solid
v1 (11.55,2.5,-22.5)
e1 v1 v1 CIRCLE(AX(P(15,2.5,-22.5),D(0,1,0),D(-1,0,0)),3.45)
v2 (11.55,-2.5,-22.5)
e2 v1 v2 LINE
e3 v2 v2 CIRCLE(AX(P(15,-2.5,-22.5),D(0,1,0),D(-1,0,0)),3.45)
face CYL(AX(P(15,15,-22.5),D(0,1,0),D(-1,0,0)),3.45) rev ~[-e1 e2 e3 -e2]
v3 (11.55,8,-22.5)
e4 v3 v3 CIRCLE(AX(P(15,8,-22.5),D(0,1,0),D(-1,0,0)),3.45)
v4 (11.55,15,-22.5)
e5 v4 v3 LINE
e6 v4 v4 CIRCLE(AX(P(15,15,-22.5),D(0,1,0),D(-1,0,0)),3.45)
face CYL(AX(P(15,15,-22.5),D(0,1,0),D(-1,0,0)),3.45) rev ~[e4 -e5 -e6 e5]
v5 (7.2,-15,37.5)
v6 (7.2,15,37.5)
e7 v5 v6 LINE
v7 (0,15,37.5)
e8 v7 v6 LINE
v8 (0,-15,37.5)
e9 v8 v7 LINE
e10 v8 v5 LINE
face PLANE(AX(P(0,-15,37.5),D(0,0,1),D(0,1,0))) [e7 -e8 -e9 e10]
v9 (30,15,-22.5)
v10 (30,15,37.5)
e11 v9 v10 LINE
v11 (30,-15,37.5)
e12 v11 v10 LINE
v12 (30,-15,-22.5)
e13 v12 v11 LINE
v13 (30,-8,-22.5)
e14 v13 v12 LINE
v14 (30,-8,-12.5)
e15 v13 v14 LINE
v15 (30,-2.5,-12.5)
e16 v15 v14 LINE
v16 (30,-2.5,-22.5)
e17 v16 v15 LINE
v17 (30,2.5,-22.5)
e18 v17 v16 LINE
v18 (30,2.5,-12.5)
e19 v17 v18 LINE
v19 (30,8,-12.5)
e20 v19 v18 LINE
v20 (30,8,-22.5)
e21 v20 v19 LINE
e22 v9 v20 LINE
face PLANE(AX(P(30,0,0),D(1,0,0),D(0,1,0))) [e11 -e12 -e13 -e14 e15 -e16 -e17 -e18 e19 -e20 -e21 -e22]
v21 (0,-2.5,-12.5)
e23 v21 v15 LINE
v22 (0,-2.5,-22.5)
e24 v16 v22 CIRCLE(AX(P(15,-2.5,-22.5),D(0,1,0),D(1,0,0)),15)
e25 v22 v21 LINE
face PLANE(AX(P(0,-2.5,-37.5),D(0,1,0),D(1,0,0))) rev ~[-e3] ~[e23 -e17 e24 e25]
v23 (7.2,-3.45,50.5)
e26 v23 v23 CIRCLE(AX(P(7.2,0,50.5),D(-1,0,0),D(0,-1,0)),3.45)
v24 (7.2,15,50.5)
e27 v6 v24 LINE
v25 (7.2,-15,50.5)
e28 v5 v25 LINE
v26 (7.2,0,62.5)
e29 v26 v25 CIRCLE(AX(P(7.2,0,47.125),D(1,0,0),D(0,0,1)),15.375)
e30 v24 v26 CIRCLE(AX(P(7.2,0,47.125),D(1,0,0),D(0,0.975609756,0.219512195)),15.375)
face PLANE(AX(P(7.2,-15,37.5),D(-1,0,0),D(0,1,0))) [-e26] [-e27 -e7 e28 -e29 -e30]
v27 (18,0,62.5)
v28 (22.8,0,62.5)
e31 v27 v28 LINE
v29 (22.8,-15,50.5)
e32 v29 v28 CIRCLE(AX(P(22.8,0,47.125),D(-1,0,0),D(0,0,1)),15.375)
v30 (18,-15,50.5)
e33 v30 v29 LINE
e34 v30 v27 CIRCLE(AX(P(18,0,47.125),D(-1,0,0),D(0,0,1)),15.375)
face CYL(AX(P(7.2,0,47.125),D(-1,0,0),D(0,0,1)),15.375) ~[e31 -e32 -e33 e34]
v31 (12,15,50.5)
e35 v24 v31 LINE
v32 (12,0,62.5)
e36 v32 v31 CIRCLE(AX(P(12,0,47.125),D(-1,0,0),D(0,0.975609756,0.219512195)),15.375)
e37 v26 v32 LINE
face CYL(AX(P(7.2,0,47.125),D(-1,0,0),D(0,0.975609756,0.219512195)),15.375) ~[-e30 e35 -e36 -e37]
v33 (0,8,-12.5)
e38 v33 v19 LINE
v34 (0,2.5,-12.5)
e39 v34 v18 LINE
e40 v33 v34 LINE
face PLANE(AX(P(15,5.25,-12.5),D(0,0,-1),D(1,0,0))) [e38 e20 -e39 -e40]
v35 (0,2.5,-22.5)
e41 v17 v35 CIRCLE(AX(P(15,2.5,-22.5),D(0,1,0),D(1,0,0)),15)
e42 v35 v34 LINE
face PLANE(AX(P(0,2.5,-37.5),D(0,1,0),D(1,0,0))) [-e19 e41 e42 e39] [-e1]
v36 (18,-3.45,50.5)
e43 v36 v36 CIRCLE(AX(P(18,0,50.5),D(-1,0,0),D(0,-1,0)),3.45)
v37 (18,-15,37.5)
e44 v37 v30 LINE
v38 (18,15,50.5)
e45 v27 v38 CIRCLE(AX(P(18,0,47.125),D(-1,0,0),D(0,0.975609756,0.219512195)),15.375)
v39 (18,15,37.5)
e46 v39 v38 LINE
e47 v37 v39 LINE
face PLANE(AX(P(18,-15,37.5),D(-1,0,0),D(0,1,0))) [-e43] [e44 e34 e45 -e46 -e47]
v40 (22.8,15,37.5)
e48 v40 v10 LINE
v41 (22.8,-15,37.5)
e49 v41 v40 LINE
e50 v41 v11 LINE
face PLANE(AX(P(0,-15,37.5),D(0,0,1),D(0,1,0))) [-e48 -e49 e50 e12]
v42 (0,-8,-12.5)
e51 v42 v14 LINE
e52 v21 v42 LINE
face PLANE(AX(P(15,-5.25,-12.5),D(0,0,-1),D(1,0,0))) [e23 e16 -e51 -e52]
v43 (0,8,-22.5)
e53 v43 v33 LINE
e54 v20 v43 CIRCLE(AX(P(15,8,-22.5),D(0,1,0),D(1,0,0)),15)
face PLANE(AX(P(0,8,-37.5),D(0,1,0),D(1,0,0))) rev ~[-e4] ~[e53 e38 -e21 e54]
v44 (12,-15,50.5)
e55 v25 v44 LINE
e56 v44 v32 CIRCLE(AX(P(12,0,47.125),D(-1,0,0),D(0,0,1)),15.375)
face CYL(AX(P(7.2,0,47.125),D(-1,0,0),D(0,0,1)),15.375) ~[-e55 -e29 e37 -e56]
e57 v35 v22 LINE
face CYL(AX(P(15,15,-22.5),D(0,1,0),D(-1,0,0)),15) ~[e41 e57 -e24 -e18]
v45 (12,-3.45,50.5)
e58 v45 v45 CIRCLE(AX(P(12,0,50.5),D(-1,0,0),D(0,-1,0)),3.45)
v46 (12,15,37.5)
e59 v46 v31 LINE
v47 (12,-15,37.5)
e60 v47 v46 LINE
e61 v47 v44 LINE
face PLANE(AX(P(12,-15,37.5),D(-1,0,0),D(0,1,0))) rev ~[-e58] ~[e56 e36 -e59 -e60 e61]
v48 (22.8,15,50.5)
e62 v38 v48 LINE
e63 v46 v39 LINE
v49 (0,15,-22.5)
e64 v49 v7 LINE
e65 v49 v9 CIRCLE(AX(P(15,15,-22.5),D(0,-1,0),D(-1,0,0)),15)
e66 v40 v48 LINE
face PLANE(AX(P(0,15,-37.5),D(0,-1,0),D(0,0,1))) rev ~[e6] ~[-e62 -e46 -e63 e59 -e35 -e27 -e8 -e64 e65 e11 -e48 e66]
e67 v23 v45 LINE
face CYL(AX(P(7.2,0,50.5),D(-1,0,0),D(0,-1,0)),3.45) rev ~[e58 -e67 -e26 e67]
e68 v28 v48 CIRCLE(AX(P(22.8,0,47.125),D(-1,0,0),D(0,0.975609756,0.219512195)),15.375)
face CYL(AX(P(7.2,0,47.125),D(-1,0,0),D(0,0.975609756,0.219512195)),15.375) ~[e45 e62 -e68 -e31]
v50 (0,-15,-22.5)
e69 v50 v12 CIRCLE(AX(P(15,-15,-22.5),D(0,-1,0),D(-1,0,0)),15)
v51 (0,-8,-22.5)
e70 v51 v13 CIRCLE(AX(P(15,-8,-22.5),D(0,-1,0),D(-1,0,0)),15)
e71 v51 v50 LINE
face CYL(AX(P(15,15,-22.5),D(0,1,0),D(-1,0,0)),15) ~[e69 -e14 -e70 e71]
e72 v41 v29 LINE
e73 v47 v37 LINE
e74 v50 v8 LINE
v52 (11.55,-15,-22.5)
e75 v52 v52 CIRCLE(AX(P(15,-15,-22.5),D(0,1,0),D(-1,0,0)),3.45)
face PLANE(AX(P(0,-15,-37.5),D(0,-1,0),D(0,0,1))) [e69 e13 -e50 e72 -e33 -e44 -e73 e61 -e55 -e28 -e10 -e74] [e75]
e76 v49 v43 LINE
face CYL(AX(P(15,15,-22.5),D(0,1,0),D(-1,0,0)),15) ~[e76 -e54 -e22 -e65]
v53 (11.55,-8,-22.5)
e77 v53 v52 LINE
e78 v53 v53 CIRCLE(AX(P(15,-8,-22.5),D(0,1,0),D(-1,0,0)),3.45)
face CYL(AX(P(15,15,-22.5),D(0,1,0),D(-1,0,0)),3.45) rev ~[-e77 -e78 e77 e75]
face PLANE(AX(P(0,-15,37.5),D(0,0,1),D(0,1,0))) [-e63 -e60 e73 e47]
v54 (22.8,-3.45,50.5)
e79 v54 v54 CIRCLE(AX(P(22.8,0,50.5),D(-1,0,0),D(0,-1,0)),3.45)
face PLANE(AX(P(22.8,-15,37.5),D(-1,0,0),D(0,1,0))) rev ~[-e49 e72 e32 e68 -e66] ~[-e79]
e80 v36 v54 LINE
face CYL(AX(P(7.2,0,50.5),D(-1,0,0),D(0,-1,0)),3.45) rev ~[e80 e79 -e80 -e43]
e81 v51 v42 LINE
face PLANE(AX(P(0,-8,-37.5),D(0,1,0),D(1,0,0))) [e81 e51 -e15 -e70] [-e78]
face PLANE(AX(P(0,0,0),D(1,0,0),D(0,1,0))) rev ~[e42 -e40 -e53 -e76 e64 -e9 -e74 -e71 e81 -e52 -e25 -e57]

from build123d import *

# Parameters (mm, degrees)
F0_W      = 30
F0_H      = 75
F1_DEPTH  = 30
F4_DEPTH  = 30.001
F2_W      = 30
F2_H      = 5.5
F5_DEPTH  = 25
F3_R      = 3.45
F6_DEPTH  = 30.001
F7_W      = 4.8
F7_H      = 30
F8_DEPTH  = 25
F10_DEPTH = 22.801
F9_R      = 3.45
F11_DEPTH = 22.801


with BuildPart() as f1:
    # F0 (on Right) → F1 (new body)
    with BuildSketch(Plane.YZ):
        Rectangle(F0_W, F0_H)
    extrude(amount=F1_DEPTH)

    # F3 (on face) → F4 (cut, through all)
    with BuildSketch(Plane(origin=(0, 15, 0), x_dir=(-1, 0, 0), z_dir=(0, 1, 0))):
        with BuildLine():
            ThreePointArc((-15, -37.5), (-25.6066017178, -33.1066017178), (-30, -22.5))
            Line((-30, -22.5), (-30, -37.5))
            Line((-30, -37.5), (-15, -37.5))
        make_face()
        with BuildLine():
            ThreePointArc((0, -22.5), (-4.3933982822, -33.1066017178), (-15, -37.5))
            Line((-15, -37.5), (0, -37.5))
            Line((0, -37.5), (0, -22.5))
        make_face()
    extrude(amount=-F4_DEPTH, mode=Mode.SUBTRACT)

    # F2 (on face) → F5 (cut)
    with BuildSketch(Plane(origin=(0, 0, -37.5), x_dir=(1, 0, 0), z_dir=(0, 0, -1))):
        with Locations((15, 5.25)):
            Rectangle(F2_W, F2_H)
        with Locations((15, -5.25)):
            Rectangle(F2_W, F2_H)
    extrude(amount=-F5_DEPTH, mode=Mode.SUBTRACT)

    # F3 (on face) → F6 (cut, through all)
    with BuildSketch(Plane(origin=(0, 15, 0), x_dir=(-1, 0, 0), z_dir=(0, 1, 0))):
        with Locations((-15, -22.5)):
            Circle(F3_R)
    extrude(amount=-F6_DEPTH, mode=Mode.SUBTRACT)

    # F7 (on face) → F8 (join)
    with BuildSketch(Plane.XY.offset(37.5)):
        with Locations((9.6, 0)):
            Rectangle(F7_W, F7_H)
        with Locations((20.4, 0)):
            Rectangle(F7_W, F7_H)
    extrude(amount=F8_DEPTH)

    # F9 (on face) → F10 (cut, through all)
    with BuildSketch(Plane(origin=(7.2, 0, 0), x_dir=(0, -1, 0), z_dir=(-1, 0, 0))):
        with BuildLine():
            ThreePointArc((-15, 50.5), (-9.6046863561, 59.1308579452), (0, 62.5))
            Line((0, 62.5), (-15, 62.5))
            Line((-15, 62.5), (-15, 50.5))
        make_face()
        with BuildLine():
            ThreePointArc((0, 62.5), (9.6046863561, 59.1308579452), (15, 50.5))
            Line((15, 50.5), (15, 62.5))
            Line((15, 62.5), (0, 62.5))
        make_face()
    extrude(amount=-F10_DEPTH, mode=Mode.SUBTRACT)

    # F9 (on face) → F11 (cut, through all)
    with BuildSketch(Plane(origin=(7.2, 0, 0), x_dir=(0, -1, 0), z_dir=(-1, 0, 0))):
        with Locations((0, 50.5)):
            Circle(F9_R)
    extrude(amount=-F11_DEPTH, mode=Mode.SUBTRACT)


solid = f1.part
